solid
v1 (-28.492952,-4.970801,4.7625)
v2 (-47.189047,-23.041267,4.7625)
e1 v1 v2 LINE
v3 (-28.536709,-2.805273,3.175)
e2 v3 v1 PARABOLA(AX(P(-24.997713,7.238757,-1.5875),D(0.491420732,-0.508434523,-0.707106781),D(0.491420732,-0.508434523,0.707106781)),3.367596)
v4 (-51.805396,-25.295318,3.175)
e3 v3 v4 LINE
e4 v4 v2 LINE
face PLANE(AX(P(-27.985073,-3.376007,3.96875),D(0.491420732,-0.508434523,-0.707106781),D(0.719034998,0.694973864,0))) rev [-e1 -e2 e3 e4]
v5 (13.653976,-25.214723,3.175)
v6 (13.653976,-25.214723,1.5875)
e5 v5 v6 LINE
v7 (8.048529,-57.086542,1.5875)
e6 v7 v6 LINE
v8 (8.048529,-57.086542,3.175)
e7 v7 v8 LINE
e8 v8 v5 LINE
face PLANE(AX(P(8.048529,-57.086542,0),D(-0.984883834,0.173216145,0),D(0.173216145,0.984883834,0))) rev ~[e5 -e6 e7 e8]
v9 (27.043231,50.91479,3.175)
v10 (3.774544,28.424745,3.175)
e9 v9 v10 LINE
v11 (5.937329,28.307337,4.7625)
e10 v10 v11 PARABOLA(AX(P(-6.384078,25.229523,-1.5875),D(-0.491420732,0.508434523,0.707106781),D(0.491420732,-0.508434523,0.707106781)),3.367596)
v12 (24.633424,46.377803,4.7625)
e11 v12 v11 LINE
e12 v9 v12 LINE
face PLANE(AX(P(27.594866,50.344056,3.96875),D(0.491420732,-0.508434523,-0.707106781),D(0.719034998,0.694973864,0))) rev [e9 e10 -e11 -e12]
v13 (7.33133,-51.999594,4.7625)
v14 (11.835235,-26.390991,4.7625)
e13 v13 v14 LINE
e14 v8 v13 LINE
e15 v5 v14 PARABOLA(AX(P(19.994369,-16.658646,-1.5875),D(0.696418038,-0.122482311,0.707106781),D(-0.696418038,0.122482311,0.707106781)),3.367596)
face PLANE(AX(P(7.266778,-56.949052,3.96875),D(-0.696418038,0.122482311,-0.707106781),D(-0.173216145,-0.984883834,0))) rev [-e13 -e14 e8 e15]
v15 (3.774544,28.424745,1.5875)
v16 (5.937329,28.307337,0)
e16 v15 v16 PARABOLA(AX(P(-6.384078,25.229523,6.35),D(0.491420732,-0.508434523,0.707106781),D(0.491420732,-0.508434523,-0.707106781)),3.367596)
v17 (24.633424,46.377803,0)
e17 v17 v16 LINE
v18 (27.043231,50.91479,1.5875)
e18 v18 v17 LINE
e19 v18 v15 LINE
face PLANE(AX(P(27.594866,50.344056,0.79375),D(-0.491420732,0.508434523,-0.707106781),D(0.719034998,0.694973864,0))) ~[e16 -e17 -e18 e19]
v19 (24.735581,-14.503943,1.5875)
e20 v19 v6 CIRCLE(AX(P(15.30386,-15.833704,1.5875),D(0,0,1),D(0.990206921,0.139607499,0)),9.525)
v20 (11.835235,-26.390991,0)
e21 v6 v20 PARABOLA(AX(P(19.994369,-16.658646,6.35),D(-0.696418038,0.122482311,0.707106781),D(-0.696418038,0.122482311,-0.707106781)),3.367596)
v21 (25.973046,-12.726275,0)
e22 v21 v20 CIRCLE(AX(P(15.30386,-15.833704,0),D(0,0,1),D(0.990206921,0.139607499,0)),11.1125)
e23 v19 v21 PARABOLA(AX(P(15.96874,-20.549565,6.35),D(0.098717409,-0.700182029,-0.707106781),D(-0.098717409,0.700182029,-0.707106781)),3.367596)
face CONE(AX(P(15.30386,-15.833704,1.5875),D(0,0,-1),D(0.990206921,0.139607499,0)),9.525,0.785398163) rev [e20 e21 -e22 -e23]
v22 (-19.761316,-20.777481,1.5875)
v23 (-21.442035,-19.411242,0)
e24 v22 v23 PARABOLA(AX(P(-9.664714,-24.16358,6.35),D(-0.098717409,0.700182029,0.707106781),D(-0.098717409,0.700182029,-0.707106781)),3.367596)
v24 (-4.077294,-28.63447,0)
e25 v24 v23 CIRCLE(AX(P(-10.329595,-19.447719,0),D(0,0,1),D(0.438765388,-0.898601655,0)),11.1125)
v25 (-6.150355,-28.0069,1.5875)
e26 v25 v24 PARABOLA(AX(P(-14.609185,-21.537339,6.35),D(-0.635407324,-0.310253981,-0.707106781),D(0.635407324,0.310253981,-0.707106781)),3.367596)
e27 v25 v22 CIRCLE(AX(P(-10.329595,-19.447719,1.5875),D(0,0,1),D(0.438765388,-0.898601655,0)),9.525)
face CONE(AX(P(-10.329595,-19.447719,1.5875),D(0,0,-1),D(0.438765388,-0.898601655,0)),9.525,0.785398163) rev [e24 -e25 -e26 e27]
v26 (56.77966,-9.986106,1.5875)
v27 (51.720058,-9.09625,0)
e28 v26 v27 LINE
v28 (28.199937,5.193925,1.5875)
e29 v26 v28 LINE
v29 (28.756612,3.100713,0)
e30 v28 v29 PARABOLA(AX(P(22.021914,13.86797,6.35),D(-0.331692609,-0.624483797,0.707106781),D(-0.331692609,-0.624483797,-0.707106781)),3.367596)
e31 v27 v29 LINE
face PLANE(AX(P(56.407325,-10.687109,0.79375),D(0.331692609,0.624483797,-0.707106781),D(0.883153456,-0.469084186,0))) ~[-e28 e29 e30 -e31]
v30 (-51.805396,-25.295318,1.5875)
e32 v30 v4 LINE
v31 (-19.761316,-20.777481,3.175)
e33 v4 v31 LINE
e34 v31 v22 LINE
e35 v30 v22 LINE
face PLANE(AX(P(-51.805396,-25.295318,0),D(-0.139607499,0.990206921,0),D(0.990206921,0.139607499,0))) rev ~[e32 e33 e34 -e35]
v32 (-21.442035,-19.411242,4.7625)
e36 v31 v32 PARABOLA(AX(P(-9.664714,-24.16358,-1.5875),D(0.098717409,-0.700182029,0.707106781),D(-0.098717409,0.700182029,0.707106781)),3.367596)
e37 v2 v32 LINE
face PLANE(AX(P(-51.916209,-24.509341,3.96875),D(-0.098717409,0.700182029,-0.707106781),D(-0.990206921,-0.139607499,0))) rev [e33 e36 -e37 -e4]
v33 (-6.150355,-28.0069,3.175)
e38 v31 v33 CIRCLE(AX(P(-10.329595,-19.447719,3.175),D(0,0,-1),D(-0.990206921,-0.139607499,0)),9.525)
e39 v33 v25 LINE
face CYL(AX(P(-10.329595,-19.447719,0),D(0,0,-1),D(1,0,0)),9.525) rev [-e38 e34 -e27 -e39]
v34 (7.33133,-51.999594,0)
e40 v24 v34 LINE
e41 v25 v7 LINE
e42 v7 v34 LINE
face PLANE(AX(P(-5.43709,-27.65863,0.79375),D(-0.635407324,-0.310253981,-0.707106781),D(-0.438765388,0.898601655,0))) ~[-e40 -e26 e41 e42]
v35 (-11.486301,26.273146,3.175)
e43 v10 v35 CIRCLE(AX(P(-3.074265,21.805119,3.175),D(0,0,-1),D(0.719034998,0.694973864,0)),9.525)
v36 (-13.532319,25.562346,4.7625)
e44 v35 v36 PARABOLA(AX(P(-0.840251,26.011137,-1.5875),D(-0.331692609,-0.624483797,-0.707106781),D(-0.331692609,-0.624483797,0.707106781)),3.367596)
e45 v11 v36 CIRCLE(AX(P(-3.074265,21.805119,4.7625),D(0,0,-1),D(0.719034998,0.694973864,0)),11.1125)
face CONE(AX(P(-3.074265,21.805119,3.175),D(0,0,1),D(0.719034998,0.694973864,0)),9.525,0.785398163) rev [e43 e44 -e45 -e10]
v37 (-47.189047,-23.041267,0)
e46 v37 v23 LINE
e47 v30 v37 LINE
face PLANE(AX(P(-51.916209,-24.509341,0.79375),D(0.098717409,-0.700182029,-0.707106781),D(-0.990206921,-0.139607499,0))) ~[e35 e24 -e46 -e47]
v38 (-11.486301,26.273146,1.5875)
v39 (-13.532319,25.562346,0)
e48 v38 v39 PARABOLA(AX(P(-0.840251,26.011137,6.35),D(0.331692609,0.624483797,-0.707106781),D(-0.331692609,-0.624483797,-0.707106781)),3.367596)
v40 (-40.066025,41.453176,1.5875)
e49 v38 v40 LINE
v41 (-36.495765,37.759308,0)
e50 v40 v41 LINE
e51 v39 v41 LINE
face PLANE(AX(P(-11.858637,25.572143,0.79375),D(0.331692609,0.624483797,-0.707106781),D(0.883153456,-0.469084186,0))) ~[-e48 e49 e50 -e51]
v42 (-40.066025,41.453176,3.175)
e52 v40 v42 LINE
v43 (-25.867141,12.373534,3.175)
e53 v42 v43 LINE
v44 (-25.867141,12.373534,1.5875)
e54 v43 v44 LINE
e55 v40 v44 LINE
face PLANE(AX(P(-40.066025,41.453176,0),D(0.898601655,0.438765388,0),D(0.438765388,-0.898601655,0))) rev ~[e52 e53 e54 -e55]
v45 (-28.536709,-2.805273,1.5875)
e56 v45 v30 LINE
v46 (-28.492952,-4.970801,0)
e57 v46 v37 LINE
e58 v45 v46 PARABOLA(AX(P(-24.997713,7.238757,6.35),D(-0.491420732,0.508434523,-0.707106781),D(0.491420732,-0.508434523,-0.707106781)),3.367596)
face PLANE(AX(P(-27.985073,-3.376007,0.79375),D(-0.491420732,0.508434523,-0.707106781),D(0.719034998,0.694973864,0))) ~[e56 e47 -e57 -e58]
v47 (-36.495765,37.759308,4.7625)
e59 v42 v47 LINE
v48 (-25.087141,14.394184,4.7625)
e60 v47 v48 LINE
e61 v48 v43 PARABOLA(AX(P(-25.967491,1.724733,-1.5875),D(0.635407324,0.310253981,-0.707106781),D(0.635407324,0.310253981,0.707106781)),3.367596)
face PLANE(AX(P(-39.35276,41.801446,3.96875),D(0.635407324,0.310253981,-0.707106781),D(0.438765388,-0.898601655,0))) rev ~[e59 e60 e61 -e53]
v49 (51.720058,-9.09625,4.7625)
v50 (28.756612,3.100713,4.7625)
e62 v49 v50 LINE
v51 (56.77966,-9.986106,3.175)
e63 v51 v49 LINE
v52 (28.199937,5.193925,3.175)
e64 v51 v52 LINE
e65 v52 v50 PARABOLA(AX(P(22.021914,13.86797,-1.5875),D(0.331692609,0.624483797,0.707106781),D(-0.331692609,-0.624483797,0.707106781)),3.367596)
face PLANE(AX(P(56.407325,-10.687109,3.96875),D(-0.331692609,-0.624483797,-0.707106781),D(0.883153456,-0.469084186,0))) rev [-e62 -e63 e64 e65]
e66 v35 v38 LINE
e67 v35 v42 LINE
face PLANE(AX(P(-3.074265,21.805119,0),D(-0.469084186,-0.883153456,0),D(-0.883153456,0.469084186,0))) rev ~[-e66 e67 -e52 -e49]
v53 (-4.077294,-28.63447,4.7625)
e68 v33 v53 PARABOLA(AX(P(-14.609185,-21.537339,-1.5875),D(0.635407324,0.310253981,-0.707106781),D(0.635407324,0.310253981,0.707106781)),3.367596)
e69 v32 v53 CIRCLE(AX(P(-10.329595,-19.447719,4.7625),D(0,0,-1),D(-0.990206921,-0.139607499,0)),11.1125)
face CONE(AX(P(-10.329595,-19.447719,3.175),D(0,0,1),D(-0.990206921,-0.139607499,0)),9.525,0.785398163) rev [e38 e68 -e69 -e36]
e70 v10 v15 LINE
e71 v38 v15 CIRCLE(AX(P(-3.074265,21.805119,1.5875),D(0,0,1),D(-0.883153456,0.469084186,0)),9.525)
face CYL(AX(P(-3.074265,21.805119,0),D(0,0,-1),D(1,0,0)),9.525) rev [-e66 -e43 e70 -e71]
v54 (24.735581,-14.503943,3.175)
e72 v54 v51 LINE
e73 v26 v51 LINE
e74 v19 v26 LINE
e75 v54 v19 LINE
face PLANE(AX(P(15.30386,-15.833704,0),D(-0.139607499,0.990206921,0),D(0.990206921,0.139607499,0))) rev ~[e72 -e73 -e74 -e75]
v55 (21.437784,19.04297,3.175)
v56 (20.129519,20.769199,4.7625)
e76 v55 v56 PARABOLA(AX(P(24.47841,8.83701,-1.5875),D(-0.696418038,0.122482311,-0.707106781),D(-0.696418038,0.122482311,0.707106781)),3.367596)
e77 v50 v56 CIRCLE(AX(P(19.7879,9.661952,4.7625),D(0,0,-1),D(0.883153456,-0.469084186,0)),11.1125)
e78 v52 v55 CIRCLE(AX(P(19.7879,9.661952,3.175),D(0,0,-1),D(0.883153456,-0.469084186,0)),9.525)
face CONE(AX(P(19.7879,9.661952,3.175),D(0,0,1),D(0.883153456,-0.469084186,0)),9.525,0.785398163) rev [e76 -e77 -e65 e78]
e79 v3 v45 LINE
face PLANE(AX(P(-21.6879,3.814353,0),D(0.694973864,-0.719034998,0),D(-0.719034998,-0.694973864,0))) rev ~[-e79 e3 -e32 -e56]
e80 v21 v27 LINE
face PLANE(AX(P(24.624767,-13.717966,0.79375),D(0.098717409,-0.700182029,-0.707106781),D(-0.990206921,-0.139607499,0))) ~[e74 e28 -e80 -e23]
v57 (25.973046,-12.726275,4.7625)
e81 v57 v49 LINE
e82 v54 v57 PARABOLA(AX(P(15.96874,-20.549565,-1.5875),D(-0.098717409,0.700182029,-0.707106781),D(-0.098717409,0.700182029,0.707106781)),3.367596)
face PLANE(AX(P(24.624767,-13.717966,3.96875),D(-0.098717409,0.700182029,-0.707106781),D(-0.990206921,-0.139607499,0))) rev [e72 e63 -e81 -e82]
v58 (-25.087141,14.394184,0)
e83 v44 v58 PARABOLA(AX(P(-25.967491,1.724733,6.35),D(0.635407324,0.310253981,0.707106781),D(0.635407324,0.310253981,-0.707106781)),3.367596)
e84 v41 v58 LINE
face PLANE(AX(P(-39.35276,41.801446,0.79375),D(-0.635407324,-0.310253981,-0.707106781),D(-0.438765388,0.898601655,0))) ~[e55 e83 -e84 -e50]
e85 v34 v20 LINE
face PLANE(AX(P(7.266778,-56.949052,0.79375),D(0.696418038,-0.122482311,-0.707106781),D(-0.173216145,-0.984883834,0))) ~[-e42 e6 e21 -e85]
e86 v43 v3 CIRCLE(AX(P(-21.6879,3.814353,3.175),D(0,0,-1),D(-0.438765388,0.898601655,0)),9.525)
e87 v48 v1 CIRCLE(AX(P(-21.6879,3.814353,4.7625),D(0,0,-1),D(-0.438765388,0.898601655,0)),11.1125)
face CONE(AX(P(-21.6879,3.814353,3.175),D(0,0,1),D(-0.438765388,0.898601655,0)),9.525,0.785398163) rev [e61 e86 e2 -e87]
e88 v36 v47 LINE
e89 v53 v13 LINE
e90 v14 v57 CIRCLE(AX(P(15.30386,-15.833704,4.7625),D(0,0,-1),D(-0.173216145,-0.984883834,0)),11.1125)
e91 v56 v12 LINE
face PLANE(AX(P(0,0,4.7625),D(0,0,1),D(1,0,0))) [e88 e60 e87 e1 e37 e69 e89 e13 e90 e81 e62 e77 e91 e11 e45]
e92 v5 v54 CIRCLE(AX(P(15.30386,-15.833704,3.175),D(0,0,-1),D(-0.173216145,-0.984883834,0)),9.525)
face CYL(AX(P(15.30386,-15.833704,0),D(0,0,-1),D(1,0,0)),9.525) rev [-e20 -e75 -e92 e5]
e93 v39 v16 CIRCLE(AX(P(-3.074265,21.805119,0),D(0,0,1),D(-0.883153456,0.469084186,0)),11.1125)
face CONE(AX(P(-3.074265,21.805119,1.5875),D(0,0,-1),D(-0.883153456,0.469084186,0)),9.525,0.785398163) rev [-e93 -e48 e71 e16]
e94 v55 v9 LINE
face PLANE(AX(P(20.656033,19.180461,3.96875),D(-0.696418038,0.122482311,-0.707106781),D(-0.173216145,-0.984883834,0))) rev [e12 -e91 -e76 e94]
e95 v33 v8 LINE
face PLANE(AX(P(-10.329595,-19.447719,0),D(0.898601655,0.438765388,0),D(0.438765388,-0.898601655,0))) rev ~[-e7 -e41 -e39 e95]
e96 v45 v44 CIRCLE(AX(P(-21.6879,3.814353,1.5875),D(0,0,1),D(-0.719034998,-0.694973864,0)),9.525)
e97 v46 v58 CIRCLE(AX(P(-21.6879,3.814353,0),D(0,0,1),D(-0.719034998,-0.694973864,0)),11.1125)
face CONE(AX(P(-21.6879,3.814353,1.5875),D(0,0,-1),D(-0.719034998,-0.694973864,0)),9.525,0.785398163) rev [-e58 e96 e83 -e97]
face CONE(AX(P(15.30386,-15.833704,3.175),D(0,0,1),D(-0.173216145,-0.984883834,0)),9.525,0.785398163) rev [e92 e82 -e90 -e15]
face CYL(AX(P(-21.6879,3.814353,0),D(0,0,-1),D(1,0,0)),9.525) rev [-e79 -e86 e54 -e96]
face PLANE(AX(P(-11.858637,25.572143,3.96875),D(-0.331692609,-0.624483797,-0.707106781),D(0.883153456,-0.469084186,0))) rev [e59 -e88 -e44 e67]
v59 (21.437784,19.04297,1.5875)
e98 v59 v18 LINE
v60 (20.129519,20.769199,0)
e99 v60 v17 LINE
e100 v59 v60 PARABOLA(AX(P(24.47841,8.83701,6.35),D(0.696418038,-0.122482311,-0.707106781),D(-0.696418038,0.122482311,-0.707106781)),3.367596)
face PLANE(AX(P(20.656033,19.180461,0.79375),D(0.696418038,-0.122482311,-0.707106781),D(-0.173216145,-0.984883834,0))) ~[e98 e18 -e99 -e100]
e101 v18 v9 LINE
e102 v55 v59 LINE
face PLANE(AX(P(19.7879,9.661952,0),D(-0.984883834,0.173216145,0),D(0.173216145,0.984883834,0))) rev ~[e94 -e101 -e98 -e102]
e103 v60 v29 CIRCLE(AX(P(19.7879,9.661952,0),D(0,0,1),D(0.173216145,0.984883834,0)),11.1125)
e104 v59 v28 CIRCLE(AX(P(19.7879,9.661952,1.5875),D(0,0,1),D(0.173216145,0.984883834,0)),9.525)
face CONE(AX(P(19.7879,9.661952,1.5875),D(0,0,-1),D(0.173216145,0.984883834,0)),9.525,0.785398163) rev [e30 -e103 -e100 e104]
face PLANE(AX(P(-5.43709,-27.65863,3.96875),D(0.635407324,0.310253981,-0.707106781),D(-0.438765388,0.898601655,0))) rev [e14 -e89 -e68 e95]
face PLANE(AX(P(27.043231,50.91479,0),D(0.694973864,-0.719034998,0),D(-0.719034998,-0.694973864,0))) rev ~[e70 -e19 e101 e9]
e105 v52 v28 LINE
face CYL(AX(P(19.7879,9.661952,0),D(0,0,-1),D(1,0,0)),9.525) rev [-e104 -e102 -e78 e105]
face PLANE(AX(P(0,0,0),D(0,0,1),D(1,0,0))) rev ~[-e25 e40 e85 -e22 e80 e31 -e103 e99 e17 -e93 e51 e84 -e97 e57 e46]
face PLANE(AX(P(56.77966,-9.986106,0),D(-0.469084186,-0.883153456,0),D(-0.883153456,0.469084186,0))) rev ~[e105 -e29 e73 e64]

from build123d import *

# Parameters (mm, degrees)
F1_DEPTH = 4.7625
F2_R     = 9.525
F3_DEPTH = 4.7635
F4_SIZE  = 1.5875


# Not quite as in the source:
# - a feature of the source that left no trace in its solid (it failed there, or was rolled back) is left out


with BuildPart() as f1:
    # F0 (on Top) → F1 (new body)
    with BuildSketch(Plane.XY):
        Polygon((-3.074264621, 21.805118867), (-40.0660246394, 41.4531760826), (-21.6879004002, 3.8143528936), (-51.8053957451, -25.295317935), (-10.3295949709, -19.4477191337), (8.0485292683, -57.0865423226), (15.3038596181, -15.8337043219), (56.7796603923, -9.9861055206), (19.787900374, 9.6619516949), (27.0432307238, 50.9147896956), align=None)
    extrude(amount=F1_DEPTH)

    # F2 (on Top) → F3 (cut, through all)
    with BuildSketch(Plane.XY):
        with Locations((15.3038596181, -15.8337043219)):
            Circle(F2_R)
        with Locations((-10.3295949709, -19.4477191337)):
            Circle(F2_R)
        with Locations((-21.6879004002, 3.8143528936)):
            Circle(F2_R)
        with Locations((-3.074264621, 21.805118867)):
            Circle(F2_R)
        with Locations((19.787900374, 9.6619516949)):
            Circle(F2_R)
    extrude(amount=F3_DEPTH, mode=Mode.SUBTRACT)

    # F4
    f4_edges = [f1.edges().sort_by_distance(p)[0] for p in [
        (24.240507, 34.97888, 4.7625),
        (15.408887, 39.669767, 4.7625),
        (-1.744503, 12.373398, 4.7625),
        (-25.776163, 33.863161, 4.7625),
        (-32.966583, 26.913355, 4.7625),
        (-12.306882, 2.164469, 4.7625),
        (-40.171052, -14.050296, 4.7625),
        (-35.783356, -23.036399, 4.7625),
        (-5.861568, -11.035682, 4.7625),
        (0.949087, -42.546721, 4.7625),
        (10.851253, -41.150633, 4.7625),
        (8.684234, -8.984896, 4.7625),
        (40.75762, -12.245024, 4.7625),
        (42.489799, -2.39609, 4.7625),
        (11.22872, 5.482711, 4.7625),
        (24.240507, 34.97888, 0),
        (15.408887, 39.669767, 0),
        (-1.744503, 12.373398, 0),
        (-25.776163, 33.863161, 0),
        (-32.966583, 26.913355, 0),
        (-12.306882, 2.164469, 0),
        (-40.171052, -14.050296, 0),
        (-35.783356, -23.036399, 0),
        (-5.861568, -11.035682, 0),
        (0.949087, -42.546721, 0),
        (10.851253, -41.150633, 0),
        (8.684234, -8.984896, 0),
        (40.75762, -12.245024, 0),
        (42.489799, -2.39609, 0),
        (11.22872, 5.482711, 0),
    ]]
    chamfer(f4_edges, length=F4_SIZE)


solid = f1.part
